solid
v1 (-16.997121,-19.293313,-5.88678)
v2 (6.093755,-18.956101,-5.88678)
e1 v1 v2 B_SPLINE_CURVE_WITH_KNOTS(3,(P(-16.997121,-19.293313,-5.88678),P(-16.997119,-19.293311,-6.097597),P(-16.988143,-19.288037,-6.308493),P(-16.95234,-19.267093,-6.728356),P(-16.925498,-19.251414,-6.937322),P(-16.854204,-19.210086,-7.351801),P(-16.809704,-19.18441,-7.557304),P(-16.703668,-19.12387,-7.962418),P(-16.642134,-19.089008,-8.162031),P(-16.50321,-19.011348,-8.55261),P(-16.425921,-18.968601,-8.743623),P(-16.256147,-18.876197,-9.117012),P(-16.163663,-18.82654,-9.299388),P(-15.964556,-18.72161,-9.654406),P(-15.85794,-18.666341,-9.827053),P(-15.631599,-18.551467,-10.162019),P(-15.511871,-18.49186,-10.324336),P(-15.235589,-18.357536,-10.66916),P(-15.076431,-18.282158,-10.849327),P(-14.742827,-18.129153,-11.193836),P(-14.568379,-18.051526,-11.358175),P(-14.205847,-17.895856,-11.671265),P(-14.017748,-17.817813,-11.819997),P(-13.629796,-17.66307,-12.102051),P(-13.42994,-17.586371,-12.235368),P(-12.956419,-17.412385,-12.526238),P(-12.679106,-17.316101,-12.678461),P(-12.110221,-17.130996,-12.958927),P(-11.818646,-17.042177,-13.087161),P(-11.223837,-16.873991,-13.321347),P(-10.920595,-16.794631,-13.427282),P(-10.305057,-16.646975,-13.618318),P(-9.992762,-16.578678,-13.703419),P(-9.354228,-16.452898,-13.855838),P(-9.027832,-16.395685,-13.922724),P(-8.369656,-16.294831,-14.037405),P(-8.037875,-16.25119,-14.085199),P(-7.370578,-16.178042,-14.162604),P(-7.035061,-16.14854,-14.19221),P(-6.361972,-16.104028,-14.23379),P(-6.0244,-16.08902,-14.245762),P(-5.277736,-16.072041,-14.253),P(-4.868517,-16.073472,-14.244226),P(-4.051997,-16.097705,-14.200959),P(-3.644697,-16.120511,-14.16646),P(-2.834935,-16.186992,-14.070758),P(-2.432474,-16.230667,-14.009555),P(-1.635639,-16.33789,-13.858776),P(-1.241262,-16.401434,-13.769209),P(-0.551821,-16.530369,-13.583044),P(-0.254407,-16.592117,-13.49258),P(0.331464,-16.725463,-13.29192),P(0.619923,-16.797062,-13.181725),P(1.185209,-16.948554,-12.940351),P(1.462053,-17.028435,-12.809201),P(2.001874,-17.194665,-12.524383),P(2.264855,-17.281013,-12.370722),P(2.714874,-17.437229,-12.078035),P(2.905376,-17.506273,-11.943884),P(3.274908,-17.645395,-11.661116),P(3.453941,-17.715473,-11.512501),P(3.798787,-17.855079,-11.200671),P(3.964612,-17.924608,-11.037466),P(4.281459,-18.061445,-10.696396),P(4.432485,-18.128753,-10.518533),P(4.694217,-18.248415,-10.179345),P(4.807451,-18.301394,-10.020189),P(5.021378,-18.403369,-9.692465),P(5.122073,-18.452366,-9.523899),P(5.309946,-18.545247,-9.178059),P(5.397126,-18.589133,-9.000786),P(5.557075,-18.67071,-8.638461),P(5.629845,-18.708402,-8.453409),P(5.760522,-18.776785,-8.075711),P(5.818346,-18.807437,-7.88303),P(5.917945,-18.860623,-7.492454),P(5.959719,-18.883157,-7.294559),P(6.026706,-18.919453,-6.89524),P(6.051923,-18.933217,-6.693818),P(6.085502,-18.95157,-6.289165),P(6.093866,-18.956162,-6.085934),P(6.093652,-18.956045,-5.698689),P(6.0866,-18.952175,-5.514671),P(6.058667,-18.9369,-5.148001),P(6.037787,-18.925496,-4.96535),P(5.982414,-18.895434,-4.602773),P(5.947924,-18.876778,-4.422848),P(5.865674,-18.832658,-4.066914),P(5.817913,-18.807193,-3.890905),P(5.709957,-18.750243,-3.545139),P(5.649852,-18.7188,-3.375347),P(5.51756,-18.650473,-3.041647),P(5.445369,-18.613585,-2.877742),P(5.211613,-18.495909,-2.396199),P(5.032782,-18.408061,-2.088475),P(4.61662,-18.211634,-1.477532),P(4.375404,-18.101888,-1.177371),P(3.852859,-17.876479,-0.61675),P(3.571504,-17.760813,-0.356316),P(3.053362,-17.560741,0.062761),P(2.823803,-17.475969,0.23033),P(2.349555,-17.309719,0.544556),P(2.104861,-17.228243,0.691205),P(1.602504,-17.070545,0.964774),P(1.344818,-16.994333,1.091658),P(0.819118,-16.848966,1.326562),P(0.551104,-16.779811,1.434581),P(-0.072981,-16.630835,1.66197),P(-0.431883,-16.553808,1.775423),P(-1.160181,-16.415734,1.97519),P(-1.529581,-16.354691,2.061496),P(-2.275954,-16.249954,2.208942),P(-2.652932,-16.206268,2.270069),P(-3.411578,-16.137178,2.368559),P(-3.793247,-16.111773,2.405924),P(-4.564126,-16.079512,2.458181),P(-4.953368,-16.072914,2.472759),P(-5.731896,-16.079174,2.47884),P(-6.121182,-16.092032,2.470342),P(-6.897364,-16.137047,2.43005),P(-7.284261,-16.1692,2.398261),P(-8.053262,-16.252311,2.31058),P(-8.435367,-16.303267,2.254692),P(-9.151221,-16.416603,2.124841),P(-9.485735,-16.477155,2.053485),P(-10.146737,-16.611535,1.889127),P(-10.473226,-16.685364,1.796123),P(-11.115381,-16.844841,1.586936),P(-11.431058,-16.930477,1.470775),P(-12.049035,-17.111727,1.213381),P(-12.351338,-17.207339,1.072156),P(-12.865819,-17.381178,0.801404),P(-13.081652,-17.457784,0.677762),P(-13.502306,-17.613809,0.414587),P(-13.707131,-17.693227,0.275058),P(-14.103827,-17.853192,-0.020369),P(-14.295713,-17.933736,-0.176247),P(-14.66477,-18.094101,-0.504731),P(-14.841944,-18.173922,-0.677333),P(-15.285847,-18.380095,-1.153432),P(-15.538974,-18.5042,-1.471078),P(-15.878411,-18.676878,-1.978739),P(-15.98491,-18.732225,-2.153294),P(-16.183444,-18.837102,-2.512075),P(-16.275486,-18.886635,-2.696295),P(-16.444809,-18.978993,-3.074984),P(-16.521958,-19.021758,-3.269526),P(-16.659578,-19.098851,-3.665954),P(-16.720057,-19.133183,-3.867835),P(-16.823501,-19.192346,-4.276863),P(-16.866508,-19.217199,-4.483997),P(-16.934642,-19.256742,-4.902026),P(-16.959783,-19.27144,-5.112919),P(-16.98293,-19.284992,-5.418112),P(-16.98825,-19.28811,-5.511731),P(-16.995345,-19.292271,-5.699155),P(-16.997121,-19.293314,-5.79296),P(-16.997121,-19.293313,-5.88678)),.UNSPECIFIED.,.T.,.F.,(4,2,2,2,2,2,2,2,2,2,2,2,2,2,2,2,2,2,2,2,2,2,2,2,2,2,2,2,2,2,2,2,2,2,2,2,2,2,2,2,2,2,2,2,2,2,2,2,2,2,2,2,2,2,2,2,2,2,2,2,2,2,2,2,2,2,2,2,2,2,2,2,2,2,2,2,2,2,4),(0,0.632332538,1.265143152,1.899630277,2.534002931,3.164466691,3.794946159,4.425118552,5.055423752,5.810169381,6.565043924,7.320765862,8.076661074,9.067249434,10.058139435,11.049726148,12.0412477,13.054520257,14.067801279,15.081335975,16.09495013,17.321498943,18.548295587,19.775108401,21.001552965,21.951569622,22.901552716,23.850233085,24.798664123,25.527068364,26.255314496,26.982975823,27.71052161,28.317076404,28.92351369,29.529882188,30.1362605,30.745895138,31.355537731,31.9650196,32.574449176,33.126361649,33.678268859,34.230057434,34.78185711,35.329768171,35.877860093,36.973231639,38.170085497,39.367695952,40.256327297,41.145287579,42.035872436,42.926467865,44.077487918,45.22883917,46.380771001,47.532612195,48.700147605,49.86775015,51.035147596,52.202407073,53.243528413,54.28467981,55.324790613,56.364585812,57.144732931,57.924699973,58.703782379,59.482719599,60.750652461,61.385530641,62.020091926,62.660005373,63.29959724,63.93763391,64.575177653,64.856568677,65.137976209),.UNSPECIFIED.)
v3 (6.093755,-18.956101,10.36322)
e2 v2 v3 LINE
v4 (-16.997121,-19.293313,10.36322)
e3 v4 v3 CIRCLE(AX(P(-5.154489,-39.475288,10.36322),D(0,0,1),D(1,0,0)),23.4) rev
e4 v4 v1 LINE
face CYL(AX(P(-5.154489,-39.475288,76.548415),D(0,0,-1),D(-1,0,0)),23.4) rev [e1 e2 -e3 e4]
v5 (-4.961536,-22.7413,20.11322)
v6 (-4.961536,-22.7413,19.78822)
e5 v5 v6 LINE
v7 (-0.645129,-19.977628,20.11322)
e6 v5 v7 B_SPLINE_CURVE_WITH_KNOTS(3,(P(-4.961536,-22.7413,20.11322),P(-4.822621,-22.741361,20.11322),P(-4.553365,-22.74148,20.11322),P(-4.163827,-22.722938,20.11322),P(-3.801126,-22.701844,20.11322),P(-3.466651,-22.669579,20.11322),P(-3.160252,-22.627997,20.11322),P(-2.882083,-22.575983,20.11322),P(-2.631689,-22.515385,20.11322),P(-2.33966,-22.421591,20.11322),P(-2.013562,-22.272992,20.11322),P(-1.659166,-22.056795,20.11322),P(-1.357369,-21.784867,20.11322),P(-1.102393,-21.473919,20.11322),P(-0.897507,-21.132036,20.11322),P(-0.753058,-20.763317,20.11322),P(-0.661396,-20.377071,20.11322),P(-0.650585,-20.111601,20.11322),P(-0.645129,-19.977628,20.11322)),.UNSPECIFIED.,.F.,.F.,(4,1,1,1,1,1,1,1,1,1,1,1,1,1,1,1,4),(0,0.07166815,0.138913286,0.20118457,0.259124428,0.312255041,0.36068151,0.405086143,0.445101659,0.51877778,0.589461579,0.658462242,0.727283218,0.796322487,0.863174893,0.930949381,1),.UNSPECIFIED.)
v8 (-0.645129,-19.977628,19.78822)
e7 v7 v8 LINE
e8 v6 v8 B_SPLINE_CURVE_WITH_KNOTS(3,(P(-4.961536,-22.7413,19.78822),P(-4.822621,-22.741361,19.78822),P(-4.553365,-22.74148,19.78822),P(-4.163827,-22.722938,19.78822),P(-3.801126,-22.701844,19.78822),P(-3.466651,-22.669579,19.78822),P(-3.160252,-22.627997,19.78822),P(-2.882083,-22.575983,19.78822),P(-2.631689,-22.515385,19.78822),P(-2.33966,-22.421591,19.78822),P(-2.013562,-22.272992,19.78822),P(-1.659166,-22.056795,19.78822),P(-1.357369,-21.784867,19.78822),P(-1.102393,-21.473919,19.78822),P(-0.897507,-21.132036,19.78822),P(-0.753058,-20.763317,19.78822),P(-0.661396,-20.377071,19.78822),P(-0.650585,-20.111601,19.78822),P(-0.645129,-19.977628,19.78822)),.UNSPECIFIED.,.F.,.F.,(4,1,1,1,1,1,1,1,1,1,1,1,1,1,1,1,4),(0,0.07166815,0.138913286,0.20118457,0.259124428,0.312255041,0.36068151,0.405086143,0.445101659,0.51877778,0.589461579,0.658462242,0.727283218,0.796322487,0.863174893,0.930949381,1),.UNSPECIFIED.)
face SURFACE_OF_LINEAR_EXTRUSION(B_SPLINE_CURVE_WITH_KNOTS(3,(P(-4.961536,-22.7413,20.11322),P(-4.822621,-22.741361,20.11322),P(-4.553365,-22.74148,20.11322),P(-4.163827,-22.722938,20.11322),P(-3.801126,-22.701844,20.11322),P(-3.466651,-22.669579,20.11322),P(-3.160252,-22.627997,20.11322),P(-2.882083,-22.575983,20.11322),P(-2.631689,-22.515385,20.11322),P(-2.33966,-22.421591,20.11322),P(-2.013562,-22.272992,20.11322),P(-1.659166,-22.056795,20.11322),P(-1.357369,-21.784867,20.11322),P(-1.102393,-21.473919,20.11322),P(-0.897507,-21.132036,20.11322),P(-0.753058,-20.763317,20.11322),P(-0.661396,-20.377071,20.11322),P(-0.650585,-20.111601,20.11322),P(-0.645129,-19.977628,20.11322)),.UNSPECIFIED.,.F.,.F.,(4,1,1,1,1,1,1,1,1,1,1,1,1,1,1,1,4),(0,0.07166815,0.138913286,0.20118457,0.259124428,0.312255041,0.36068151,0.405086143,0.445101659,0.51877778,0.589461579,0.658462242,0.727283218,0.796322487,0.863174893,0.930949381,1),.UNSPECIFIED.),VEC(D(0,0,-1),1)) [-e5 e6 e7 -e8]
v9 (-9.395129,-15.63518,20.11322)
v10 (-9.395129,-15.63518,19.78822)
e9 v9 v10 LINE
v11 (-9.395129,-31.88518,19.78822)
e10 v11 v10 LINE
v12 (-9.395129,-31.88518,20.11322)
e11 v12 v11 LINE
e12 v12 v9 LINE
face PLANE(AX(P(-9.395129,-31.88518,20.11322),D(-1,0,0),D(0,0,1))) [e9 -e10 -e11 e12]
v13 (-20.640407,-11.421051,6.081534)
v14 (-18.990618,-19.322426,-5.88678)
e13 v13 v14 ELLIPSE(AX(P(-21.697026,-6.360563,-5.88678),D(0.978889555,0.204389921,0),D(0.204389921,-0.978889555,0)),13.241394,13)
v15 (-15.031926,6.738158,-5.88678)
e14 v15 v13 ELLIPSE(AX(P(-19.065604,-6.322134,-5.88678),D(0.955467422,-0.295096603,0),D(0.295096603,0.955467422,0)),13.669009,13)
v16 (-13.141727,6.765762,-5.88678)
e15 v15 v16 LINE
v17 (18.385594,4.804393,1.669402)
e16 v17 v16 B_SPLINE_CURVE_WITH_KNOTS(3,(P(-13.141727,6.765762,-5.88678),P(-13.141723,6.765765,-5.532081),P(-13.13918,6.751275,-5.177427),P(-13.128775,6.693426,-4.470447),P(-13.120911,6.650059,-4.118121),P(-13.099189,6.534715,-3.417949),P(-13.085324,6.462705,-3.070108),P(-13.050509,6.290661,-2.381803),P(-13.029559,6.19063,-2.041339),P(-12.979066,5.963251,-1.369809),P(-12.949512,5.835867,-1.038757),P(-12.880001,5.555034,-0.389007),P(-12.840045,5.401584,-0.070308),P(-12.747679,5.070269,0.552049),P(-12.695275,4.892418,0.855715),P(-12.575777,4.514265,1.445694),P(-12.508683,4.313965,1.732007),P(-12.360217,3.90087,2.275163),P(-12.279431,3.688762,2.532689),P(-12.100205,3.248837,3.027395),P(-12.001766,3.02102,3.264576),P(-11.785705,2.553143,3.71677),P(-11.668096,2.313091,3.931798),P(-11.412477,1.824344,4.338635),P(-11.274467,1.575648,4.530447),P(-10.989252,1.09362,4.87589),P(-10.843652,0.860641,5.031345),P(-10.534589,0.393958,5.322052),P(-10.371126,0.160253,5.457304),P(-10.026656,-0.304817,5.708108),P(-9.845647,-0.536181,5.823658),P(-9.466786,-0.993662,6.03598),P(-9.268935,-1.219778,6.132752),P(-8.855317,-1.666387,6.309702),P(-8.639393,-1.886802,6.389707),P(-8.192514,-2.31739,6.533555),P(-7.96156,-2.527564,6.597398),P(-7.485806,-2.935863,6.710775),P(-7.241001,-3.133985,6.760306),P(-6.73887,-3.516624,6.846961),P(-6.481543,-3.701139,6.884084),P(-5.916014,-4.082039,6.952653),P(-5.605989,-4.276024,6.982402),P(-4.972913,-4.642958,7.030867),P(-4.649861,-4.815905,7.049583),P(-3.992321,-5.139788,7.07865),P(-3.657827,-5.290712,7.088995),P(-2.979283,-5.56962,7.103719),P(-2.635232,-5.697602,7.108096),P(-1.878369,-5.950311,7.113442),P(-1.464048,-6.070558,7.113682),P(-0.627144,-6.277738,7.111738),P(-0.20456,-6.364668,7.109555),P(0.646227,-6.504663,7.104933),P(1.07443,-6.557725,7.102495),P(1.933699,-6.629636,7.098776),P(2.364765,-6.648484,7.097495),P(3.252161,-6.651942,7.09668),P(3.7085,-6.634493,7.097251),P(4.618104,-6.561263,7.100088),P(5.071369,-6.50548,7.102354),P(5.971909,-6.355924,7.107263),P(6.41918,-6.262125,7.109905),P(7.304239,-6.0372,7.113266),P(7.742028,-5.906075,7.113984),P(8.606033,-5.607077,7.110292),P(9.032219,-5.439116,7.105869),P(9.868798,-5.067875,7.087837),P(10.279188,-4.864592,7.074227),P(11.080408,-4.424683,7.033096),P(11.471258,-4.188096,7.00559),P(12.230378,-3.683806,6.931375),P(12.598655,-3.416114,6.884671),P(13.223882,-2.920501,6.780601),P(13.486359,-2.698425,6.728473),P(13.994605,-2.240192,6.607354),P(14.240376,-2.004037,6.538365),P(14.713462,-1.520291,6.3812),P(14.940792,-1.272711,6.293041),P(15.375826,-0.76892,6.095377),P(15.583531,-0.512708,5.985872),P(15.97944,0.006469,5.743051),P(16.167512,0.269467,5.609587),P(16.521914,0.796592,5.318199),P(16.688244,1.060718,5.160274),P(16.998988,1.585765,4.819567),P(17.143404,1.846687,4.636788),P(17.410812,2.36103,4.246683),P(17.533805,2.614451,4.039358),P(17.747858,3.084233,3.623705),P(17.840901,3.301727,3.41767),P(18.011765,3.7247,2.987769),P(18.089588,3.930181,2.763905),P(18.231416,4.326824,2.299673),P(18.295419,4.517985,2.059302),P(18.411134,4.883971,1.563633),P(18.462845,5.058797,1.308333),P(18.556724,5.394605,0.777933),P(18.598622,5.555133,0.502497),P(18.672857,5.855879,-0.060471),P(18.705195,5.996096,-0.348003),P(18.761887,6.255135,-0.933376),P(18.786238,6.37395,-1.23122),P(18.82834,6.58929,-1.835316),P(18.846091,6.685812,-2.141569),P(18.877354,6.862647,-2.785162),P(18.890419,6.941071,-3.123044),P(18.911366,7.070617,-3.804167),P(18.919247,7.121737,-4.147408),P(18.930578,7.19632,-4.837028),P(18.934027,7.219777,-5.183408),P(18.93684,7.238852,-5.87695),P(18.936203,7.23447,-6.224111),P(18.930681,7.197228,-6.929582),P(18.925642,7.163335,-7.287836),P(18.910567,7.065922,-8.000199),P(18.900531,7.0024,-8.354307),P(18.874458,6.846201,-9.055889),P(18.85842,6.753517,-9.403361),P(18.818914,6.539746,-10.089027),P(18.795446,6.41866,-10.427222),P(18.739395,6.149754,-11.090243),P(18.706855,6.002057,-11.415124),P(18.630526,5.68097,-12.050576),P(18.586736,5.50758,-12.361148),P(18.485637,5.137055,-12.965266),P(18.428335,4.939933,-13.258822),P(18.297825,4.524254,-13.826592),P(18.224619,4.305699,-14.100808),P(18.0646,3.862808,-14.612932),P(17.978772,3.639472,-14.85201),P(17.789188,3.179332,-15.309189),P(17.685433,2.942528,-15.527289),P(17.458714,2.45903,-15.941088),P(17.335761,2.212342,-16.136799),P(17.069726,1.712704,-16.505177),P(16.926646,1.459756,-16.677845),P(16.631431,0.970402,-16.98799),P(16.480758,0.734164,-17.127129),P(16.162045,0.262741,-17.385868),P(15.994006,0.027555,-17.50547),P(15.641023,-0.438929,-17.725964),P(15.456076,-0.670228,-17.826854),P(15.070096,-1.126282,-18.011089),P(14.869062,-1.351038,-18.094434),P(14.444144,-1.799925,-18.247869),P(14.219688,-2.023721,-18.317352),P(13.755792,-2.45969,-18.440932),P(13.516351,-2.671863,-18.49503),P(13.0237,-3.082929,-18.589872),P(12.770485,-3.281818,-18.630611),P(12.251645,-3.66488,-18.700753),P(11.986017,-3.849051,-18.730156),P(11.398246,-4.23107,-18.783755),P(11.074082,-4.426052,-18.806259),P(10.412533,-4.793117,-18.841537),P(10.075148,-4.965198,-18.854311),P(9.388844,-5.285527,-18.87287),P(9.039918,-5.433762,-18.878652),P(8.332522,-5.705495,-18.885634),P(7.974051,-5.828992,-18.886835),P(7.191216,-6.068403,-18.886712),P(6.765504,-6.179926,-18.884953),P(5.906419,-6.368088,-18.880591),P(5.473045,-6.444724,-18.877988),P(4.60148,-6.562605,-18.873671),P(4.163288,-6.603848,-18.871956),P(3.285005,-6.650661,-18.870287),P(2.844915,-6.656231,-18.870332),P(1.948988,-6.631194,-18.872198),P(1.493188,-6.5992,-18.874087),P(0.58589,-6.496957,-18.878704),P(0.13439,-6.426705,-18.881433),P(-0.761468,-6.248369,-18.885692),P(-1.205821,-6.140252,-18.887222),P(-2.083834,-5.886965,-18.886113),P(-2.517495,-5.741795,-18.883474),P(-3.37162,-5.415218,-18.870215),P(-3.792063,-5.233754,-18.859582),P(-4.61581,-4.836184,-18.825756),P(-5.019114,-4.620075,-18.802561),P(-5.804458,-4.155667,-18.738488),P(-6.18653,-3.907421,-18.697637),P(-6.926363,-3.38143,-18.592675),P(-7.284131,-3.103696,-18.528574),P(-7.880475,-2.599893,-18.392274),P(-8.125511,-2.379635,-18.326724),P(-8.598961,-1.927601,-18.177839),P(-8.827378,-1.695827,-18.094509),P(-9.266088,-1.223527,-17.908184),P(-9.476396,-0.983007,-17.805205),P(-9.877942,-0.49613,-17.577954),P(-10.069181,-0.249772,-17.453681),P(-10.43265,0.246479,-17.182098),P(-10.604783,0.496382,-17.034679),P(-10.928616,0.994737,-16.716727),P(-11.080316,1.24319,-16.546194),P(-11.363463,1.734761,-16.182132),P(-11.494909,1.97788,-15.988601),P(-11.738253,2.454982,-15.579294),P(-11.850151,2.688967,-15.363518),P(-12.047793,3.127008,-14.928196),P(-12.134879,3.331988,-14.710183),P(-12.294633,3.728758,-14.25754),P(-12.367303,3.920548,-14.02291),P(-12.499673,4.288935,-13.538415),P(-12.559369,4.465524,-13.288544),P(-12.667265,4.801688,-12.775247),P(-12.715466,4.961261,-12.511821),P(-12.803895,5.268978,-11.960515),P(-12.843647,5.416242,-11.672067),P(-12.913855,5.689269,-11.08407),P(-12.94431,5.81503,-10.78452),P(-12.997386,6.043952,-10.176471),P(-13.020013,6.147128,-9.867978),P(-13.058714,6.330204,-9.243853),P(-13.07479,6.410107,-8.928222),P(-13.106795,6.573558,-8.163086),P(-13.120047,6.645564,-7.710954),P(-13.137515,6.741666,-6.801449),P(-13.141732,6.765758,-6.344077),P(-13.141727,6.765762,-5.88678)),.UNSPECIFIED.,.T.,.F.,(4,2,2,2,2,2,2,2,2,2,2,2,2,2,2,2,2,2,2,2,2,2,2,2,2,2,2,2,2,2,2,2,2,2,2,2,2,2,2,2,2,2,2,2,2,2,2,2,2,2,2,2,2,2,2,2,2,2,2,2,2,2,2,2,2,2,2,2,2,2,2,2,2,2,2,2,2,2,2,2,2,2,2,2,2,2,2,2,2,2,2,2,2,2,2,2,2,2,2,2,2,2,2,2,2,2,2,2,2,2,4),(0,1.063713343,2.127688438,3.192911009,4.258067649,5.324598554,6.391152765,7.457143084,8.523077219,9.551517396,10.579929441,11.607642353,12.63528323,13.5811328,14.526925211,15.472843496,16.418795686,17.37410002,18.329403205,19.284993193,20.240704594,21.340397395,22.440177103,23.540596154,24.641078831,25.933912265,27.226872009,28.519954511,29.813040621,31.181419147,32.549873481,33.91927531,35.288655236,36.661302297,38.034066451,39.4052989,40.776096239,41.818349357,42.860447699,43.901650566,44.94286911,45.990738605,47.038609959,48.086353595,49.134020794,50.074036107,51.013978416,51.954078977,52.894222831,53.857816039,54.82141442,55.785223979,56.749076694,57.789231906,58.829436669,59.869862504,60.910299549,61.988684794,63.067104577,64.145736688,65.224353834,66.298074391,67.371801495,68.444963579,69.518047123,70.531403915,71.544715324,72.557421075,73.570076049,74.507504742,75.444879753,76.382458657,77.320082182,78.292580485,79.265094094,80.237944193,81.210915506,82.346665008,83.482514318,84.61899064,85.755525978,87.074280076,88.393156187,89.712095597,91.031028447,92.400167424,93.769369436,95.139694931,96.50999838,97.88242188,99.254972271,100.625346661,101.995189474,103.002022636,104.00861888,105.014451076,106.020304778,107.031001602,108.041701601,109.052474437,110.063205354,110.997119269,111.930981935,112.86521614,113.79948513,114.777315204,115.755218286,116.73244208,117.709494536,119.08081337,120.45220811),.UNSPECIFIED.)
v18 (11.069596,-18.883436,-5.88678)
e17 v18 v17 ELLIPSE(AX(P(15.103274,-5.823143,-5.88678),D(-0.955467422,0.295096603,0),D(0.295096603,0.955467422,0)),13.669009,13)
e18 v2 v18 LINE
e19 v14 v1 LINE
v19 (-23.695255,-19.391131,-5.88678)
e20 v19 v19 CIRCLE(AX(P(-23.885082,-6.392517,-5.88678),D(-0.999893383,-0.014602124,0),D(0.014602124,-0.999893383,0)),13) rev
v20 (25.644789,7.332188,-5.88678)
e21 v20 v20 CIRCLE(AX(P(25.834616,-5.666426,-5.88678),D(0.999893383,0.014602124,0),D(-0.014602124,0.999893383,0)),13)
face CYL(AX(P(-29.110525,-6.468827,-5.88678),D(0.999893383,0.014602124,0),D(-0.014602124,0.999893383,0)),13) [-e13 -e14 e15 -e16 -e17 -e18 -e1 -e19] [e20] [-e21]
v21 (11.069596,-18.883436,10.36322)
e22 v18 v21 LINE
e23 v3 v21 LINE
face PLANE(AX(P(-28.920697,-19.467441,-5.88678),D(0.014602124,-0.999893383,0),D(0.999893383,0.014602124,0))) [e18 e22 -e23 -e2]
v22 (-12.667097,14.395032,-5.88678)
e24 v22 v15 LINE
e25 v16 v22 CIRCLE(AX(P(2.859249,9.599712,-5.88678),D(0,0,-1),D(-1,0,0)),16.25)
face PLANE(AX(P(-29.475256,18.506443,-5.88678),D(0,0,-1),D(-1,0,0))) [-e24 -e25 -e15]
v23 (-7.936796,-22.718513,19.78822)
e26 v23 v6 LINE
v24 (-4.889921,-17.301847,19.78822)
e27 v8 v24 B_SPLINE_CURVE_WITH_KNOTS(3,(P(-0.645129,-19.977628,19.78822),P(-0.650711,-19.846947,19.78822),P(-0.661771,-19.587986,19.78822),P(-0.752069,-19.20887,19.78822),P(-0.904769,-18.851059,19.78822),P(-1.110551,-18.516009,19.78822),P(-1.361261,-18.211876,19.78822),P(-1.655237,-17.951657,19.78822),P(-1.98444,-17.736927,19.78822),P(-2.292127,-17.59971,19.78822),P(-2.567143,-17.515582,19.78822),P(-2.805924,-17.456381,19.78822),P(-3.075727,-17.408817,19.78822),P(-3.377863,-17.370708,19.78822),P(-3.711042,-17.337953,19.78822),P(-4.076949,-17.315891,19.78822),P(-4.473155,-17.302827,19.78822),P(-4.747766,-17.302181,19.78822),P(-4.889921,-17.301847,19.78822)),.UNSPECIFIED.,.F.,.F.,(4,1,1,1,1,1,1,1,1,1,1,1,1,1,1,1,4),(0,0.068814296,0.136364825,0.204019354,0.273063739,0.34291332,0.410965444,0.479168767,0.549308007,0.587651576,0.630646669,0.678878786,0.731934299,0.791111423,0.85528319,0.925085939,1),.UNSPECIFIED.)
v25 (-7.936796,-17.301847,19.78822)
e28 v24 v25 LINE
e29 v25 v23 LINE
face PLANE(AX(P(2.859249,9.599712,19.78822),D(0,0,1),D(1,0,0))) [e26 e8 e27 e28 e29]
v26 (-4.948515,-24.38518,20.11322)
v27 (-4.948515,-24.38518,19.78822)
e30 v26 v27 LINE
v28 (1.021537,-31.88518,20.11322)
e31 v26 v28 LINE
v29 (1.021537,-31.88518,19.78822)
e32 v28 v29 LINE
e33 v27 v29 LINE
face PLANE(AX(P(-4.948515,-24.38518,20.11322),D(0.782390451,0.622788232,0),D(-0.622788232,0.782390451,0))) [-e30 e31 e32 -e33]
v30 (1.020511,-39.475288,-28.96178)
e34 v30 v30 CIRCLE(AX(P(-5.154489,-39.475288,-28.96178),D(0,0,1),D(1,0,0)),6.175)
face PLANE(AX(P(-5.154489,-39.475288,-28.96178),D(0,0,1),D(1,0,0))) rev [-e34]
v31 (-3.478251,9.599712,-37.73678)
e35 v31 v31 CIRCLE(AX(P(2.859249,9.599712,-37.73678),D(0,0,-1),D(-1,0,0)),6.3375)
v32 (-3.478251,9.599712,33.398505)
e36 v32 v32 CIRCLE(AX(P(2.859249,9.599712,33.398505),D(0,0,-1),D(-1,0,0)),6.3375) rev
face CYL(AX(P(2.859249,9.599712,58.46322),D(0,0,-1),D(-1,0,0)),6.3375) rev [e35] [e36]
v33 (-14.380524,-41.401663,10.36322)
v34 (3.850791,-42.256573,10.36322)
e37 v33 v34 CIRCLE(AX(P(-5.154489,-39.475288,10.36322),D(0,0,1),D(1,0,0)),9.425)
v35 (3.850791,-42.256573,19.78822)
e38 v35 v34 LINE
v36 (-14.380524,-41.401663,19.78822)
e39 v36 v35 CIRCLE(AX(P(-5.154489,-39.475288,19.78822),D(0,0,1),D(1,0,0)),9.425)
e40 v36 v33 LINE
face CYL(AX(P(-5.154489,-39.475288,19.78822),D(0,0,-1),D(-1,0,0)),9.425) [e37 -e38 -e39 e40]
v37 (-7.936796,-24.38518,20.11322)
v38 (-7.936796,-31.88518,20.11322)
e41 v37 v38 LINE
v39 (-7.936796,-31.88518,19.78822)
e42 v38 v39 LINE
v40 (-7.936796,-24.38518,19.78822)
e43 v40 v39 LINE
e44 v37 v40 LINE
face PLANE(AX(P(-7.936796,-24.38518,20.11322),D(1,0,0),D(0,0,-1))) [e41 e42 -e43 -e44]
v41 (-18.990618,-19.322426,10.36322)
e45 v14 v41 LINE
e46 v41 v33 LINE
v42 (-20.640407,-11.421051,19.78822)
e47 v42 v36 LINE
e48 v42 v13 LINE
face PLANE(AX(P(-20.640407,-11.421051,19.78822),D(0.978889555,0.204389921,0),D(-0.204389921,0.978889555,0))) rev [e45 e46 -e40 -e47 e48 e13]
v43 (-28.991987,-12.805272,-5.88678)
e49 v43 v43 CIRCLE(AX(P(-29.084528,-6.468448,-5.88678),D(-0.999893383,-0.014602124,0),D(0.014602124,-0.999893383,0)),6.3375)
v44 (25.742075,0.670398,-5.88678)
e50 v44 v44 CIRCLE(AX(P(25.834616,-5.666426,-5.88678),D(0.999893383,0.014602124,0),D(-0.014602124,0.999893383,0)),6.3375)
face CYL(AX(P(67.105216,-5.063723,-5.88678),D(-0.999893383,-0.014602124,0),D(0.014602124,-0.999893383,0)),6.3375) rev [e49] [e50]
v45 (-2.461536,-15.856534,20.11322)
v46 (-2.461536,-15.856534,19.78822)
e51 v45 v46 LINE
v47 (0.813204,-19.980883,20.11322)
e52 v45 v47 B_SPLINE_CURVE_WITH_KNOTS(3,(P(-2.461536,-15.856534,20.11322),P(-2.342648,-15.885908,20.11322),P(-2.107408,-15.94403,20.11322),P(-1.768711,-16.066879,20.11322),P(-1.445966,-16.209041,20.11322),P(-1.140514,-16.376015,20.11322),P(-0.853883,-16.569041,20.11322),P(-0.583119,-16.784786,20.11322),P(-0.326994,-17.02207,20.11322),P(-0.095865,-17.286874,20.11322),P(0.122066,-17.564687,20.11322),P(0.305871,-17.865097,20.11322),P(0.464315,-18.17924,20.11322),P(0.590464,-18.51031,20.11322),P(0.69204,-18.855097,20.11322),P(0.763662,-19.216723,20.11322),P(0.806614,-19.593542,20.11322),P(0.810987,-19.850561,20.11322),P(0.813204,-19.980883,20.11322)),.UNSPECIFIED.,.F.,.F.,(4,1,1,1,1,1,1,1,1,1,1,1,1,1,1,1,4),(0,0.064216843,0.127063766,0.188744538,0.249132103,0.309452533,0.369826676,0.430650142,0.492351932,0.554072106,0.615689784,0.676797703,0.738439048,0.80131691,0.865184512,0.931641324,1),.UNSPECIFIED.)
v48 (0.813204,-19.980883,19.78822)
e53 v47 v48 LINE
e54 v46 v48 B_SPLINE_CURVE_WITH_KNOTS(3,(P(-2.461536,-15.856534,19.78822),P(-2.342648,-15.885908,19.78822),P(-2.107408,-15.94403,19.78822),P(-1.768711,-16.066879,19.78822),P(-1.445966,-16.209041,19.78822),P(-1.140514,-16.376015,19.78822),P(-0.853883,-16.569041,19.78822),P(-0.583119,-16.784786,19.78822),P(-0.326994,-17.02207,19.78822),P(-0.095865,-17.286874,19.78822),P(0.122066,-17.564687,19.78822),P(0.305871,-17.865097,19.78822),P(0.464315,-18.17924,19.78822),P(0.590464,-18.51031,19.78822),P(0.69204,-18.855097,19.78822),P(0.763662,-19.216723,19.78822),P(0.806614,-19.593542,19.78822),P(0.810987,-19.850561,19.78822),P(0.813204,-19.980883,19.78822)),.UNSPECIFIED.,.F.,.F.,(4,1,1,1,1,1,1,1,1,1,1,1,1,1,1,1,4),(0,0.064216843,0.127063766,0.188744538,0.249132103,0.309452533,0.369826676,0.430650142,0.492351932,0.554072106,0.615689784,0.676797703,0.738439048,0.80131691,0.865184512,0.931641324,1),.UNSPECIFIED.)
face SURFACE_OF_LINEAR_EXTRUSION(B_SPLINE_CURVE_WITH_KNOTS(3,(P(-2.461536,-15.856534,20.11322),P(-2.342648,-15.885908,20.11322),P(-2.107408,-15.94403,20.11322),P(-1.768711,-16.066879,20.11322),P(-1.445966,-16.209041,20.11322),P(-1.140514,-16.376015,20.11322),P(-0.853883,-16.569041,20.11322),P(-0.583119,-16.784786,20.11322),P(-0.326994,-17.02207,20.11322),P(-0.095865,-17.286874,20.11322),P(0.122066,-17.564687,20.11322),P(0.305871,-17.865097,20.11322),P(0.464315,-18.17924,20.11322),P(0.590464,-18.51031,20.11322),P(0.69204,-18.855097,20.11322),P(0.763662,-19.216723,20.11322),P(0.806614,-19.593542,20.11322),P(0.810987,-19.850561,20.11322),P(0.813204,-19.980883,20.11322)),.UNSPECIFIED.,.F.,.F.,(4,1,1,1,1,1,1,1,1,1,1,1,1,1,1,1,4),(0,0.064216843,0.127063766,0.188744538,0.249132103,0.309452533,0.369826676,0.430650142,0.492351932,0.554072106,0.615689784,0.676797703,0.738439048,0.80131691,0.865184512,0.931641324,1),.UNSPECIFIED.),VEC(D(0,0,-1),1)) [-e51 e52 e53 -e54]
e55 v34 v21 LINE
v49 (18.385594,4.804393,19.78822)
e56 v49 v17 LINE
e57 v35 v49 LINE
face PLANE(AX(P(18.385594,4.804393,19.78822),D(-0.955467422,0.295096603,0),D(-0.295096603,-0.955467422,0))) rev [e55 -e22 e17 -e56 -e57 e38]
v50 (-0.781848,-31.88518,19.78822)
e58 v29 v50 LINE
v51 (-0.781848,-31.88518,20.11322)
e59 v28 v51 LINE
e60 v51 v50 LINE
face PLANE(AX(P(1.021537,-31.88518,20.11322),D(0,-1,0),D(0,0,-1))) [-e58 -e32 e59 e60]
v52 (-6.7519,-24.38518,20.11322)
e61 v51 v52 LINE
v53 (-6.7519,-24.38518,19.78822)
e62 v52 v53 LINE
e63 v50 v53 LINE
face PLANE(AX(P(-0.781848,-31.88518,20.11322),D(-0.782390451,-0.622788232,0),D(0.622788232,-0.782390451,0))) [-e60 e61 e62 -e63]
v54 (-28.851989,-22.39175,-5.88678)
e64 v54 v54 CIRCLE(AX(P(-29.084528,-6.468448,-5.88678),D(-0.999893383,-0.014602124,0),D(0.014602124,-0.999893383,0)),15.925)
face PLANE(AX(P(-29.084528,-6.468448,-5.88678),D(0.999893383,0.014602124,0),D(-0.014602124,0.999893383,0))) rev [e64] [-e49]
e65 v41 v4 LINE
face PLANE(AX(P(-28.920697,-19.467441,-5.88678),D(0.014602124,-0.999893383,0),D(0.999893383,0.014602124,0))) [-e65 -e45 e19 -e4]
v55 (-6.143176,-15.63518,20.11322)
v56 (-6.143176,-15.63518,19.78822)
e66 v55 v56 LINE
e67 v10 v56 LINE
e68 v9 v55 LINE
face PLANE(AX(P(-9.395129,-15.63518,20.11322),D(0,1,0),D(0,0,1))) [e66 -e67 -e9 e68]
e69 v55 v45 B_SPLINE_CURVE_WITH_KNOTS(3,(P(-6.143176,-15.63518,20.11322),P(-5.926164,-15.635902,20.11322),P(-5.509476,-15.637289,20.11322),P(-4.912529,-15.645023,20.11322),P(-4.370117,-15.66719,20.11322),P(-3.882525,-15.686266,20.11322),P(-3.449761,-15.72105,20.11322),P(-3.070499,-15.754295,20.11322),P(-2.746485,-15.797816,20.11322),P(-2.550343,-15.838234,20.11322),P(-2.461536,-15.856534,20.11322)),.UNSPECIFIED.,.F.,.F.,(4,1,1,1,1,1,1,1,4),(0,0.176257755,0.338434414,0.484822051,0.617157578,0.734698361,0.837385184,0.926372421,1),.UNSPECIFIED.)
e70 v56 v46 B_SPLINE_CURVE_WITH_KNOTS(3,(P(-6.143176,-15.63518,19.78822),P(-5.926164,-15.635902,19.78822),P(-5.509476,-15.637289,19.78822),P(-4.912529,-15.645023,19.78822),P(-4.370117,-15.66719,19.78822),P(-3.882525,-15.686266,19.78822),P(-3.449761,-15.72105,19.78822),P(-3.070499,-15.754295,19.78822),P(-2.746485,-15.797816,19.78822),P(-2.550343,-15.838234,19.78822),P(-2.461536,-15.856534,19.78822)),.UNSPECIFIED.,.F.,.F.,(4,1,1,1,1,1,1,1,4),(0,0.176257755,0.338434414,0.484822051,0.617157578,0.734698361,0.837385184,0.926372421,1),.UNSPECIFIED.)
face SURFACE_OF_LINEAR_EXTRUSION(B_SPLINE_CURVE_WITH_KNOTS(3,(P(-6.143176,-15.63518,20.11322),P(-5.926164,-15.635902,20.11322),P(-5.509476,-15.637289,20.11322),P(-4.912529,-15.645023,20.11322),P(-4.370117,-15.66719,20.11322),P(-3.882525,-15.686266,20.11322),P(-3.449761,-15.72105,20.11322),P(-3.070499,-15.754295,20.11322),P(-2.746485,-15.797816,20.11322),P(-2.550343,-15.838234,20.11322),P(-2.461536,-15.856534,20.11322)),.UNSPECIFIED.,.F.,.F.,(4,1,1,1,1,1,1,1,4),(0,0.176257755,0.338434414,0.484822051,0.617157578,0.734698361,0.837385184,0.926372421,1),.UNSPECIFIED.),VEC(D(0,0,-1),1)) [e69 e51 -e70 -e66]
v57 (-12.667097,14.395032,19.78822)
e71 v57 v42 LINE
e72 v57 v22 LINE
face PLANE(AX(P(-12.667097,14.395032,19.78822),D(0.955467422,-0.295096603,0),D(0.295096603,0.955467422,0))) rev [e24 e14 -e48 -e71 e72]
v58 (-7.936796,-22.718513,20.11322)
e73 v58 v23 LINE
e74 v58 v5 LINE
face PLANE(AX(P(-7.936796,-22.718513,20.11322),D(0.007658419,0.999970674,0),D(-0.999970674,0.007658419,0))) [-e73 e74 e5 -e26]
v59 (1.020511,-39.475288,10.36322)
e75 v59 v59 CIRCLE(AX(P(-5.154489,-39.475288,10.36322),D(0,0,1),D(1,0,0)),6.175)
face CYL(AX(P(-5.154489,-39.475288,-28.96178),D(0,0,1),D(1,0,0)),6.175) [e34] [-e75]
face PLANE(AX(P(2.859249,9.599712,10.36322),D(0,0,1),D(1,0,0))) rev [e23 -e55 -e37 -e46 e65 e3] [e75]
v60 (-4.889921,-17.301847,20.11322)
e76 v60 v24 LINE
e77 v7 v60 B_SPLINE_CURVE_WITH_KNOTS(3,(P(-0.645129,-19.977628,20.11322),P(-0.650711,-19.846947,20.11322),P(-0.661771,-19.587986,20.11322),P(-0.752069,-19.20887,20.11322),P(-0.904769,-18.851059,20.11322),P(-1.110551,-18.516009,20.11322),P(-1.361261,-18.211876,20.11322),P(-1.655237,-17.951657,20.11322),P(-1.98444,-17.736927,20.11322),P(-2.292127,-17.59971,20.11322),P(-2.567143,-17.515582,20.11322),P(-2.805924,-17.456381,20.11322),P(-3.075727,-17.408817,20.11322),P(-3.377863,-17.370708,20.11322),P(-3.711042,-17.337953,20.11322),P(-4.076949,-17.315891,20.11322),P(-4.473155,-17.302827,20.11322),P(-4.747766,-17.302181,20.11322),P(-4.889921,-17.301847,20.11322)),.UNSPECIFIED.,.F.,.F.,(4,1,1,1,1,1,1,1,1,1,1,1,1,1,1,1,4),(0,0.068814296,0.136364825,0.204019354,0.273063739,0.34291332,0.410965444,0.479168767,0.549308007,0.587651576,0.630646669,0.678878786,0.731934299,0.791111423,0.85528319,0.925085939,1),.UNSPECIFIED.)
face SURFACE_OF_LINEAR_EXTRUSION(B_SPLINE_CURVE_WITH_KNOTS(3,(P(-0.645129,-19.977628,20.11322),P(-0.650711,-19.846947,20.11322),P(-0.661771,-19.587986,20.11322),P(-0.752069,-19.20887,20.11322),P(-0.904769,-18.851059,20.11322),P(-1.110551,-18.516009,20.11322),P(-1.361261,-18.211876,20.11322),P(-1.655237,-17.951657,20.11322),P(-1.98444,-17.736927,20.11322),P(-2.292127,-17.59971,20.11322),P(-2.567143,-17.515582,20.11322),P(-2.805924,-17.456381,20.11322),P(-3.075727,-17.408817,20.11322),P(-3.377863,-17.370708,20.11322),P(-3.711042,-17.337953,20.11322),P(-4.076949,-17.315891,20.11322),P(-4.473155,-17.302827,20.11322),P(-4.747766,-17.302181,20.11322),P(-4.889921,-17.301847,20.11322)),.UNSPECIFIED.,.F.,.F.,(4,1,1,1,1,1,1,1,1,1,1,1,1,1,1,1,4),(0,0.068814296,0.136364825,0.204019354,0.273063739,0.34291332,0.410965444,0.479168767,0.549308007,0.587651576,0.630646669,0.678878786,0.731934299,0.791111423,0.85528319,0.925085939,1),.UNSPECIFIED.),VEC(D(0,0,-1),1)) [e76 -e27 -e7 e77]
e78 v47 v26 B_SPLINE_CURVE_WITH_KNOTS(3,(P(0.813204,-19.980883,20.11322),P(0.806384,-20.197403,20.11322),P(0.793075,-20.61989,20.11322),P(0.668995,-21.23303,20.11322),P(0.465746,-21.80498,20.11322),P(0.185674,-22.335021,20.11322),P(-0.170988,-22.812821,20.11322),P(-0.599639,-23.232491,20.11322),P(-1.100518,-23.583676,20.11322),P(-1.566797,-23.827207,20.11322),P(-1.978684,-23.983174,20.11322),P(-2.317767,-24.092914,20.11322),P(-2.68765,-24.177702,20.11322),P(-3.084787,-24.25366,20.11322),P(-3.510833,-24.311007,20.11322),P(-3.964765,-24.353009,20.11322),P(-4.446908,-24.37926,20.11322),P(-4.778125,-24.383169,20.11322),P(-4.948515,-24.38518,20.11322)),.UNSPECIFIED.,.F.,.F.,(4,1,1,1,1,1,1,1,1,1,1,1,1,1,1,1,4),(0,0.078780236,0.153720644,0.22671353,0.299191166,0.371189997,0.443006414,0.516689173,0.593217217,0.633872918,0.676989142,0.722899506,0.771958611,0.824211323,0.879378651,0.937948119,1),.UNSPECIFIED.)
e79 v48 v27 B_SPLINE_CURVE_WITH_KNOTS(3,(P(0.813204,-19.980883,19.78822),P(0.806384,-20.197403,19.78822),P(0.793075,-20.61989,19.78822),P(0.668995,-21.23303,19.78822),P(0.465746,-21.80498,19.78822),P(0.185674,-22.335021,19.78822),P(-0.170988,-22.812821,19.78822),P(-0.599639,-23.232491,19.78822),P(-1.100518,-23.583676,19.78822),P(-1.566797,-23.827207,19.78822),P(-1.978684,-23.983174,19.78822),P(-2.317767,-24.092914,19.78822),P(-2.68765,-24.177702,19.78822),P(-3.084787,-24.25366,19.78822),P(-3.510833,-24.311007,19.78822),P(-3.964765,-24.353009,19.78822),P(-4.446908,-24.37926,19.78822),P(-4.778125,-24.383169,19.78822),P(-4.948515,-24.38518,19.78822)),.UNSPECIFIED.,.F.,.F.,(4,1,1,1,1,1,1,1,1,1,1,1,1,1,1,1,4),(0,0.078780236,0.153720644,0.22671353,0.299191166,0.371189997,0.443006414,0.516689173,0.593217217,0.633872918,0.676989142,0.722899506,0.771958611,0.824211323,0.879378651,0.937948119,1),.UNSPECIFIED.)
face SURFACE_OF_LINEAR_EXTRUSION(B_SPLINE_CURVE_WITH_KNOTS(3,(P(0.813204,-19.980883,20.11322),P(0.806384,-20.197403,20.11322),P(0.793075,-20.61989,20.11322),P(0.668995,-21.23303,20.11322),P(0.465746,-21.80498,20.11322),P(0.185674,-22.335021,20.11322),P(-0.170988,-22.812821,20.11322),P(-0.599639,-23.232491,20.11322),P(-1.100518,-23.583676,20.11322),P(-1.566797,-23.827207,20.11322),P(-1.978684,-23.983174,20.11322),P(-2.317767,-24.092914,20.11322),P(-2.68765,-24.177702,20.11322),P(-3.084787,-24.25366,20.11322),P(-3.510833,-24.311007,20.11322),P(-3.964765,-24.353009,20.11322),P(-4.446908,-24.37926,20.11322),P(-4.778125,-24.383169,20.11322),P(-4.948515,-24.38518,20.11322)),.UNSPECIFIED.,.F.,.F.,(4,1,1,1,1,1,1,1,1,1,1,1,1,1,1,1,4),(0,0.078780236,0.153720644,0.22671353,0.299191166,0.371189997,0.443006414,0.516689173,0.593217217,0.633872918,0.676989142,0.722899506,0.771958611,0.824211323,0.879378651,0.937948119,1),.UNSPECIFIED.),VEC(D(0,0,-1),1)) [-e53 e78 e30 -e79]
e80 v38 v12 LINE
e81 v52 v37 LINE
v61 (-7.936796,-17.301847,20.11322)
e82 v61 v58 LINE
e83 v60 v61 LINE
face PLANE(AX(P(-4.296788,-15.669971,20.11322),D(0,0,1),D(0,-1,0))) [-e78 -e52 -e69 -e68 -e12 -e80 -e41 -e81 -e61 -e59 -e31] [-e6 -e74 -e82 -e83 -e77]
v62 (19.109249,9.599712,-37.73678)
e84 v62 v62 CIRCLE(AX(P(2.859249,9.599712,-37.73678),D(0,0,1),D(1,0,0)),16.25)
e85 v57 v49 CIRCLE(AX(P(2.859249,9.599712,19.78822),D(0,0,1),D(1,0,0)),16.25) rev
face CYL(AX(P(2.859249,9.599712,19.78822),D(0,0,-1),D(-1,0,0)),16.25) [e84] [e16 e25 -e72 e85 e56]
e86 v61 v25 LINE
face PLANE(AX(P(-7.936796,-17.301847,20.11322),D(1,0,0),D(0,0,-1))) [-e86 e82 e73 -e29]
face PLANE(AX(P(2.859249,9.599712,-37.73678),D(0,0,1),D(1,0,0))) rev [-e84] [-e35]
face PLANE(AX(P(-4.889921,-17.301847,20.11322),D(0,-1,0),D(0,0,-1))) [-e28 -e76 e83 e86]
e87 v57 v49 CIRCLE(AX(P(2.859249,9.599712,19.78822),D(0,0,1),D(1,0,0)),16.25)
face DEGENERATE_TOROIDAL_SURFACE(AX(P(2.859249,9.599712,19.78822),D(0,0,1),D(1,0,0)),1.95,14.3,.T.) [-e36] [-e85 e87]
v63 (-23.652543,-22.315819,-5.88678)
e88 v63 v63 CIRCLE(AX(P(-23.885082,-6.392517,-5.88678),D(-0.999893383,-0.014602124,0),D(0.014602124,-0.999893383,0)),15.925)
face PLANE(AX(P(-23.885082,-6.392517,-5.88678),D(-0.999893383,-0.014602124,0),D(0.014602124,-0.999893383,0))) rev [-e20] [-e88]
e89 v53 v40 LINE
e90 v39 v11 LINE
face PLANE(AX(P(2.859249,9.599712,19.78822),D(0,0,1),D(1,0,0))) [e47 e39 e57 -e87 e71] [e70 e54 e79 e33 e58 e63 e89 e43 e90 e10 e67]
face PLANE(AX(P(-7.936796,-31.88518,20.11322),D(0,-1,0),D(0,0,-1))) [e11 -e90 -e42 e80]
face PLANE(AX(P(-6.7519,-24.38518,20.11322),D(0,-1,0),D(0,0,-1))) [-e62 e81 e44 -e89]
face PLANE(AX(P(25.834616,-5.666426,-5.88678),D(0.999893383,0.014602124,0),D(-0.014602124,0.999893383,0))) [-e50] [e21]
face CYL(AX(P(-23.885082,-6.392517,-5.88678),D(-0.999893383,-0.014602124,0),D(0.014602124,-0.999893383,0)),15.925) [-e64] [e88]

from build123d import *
from build123d.topology import SkipClean

# Parameters (mm, degrees)
BOSS_EXTRU_1_DEPTH      = 1.45
ESQUISSE2_R             = 2.5
BOSS_EXTRU_2_DEPTH      = 2.2
BOSS_EXTRU_3_START      = -11.05
ESQUISSE3_R             = 2.5
BOSS_EXTRU_3_DEPTH      = 11.05
BOSS_EXTRU_4_START      = -1.45
ESQUISSE4_R             = 0.95
BOSS_EXTRU_4_DEPTH      = 7.5
CONG_1_R                = 2.2
BOSS_EXTRU_5_DEPTH      = 1
BOSS_EXTRU_5_DEPTH_BACK = 7.454
ENL_V_START             = -6
ENL_V_MAT_EXTRU_2_DEPTH = 6
BOSS_EXTRU_6_DEPTH      = 1
BOSS_EXTRU_6_DEPTH_BACK = 7.45
ESQUISSE8_R             = 2
ESQUISSE9_R             = 2.45
BOSS_EXTRU_7_DEPTH      = 0.8
ENL_V_START_2           = -6.05
ESQUISSE10_R            = 3.6
ESQUISSE10_R_2          = 0.95
ENL_V_MAT_EXTRU_3_DEPTH = 6.05
ESQUISSE11_R            = 0.975
ENL_V_MAT_EXTRU_4_DEPTH = 14.8
ESQUISSE12_R            = 0.975
ENL_V_MAT_EXTRU_5_DEPTH = 14.8
BOSS_EXTRU_8_DEPTH      = 0.05
SCALE1_SCALE            = 6.5


with BuildPart() as part:
    # Esquisse1 → Boss.-Extru.1 (new body)
    with BuildSketch(Plane.XY):
        with BuildLine():
            Line((2.388668556, -0.737741507), (0.152544962, -7.977890074))
            ThreePointArc((0.152544962, -7.977890074), (-1.300802178, -8.998408422), (-2.652272655, -7.846365386))
            Line((-2.652272655, -7.846365386), (-3.615331703, -3.23396357))
            Line((-3.615331703, -3.23396357), (-2.388668556, 0.737741507))
            ThreePointArc((-2.388668556, 0.737741507), (0.737741507, 2.388668556), (2.388668556, -0.737741507))
        make_face()
    extrude(amount=BOSS_EXTRU_1_DEPTH)

    # Esquisse2 → Boss.-Extru.2 (add)
    with BuildSketch(Plane.XY.offset(1.45)):
        with Locations(Location((0, 0, 0), (0, 0, 162.836669811))):
            Circle(ESQUISSE2_R)
    extrude(amount=BOSS_EXTRU_2_DEPTH)

    # Esquisse3 → Boss.-Extru.3 (add)
    with BuildSketch(Plane.XY.offset(3.65).offset(BOSS_EXTRU_3_START)):
        Circle(ESQUISSE3_R)
    extrude(amount=BOSS_EXTRU_3_DEPTH)

    # Esquisse4 → Boss.-Extru.4 (add)
    with BuildSketch(Plane(origin=(0, 0, 0), x_dir=(-1, 0, 0), z_dir=(0, 0, -1)).offset(BOSS_EXTRU_4_START)):
        with Locations(Location((1.232882801, -7.55, 0), (0, 0, 180))):
            Circle(ESQUISSE4_R)
    extrude(amount=BOSS_EXTRU_4_DEPTH)

    # Congé1
    cong_1_edges = [part.edges().sort_by_distance(p)[0] for p in [
        (2.388668556, -0.737741507, 3.65),
    ]]
    fillet(cong_1_edges, radius=CONG_1_R - 0.0001)  # a hair under: the kernel refuses the full size

    # Esquisse5 → Boss.-Extru.5 (add, two sides: drawn at the far end of the back side and taken through both)
    with SkipClean():  # the faces are left unmerged after this step: merging them gives an invalid solid
        with BuildSketch(Plane(origin=(2.499733458, 0.03650531, 0), x_dir=(0, 0, -1), z_dir=(0.9998933833040308, 0.014602123983129264, 0)).offset(-BOSS_EXTRU_5_DEPTH_BACK)):
            with BuildLine():
                Line((2.5, -4.4), (0, -4.4))
                Line((0, -4.4), (0, 1.44275903))
                Line((0, 1.44275903), (2.5, 1.44275903))
                Line((2.5, 1.44275903), (2.5, -0.4))
                ThreePointArc((2.5, -0.4), (4.5, -2.4), (2.5, -4.4))
            make_face()
        extrude(amount=BOSS_EXTRU_5_DEPTH + BOSS_EXTRU_5_DEPTH_BACK)
    add(part.part.scale(1), mode=Mode.REPLACE)  # the faces are merged on a copy

    # Esquisse7 → Enlèv. mat.-Extru.2 (cut)
    with SkipClean():  # the faces are left unmerged after this step: merging them gives an invalid solid
        with BuildSketch(Plane.XY.offset(ENL_V_START)):
            with BuildLine():
                Line((-2.062527014, 1.412792382), (-4.974539167, 1.370266286))
                Line((-4.974539167, 1.370266286), (-4.889222475, -4.471869809))
                Line((-4.889222475, -4.471869809), (-3.361517986, -4.4495597))
                Line((-3.361517986, -4.4495597), (-3.615331703, -3.23396357))
                Line((-3.615331703, -3.23396357), (-2.388668556, 0.737741507))
                ThreePointArc((-2.388668556, 0.737741507), (-2.251046184, 1.087561988), (-2.062527014, 1.412792382))
            make_face()
            with BuildLine():
                Line((1.263130408, -4.38202281), (3.563876187, -4.348423453))
                Line((3.563876187, -4.348423453), (3.478559495, 1.493712642))
                Line((3.478559495, 1.493712642), (2.020392322, 1.472418034))
                ThreePointArc((2.020392322, 1.472418034), (2.46599995, 0.410906614), (2.388668556, -0.737741507))
                Line((2.388668556, -0.737741507), (1.263130408, -4.38202281))
            make_face()
        extrude(amount=ENL_V_MAT_EXTRU_2_DEPTH, mode=Mode.SUBTRACT)
    add(part.part.scale(1), mode=Mode.REPLACE)  # the faces are merged on a copy

    # Esquisse8 → Boss.-Extru.6 (add, two sides: drawn at the far end of the back side and taken through both)
    with BuildSketch(Plane(origin=(2.499733458, 0.03650531, 0), x_dir=(0, 0, -1), z_dir=(0.9998933833040308, 0.014602123983129264, 0)).offset(-BOSS_EXTRU_6_DEPTH_BACK)):
        with Locations(Location((2.5, -2.4, 0), (0, 0, 90))):
            Circle(ESQUISSE8_R)
    extrude(amount=BOSS_EXTRU_6_DEPTH + BOSS_EXTRU_6_DEPTH_BACK)

    # Esquisse9 → Boss.-Extru.7 (add)
    with BuildSketch(Plane(origin=(-4.949472247, -0.072280514, 0), x_dir=(0, 0, 1), z_dir=(-0.9998933833040308, -0.014602123983129264, 0))):
        with Locations(Location((-2.5, -2.4, 0), (0, 0, 270))):
            Circle(ESQUISSE9_R)
    extrude(amount=-BOSS_EXTRU_7_DEPTH)

    # Esquisse10 → Enlèv. mat.-Extru.3 (cut)
    with BuildSketch(Plane(origin=(0, 0, -6.05), x_dir=(-1, 0, 0), z_dir=(0, 0, -1)).offset(ENL_V_START_2)):
        with Locations((1.232882801, -7.55)):
            Circle(ESQUISSE10_R)
        with Locations(Location((1.232882801, -7.55, 0), (0, 0, 180))):
            Circle(ESQUISSE10_R_2, mode=Mode.SUBTRACT)
    extrude(amount=ENL_V_MAT_EXTRU_3_DEPTH, mode=Mode.SUBTRACT)

    # Esquisse11 → Enlèv. mat.-Extru.4 (cut)
    with BuildSketch(Plane(origin=(0, 0, -7.4), x_dir=(-1, 0, 0), z_dir=(0, 0, -1))):
        Circle(ESQUISSE11_R)
    extrude(amount=-ENL_V_MAT_EXTRU_4_DEPTH, mode=Mode.SUBTRACT)

    # Esquisse12 → Enlèv. mat.-Extru.5 (cut)
    with BuildSketch(Plane(origin=(-4.949472247, -0.072280514, 0), x_dir=(0, 0, 1), z_dir=(-0.9998933833040308, -0.014602123983129264, 0))):
        with Locations(Location((-2.5, -2.4, 0), (0, 0, 270))):
            Circle(ESQUISSE12_R)
    extrude(amount=-ENL_V_MAT_EXTRU_5_DEPTH, mode=Mode.SUBTRACT)

    # Esquisse13 → Boss.-Extru.8 (add)
    with BuildSketch(Plane.XY.offset(1.45)):
        with BuildLine():
            Line((-1.885288931, -3.882291157), (-1.38498845, -3.882291157))
            add(Edge.make_bspline(
                [(-1.38498845, -3.882291157), (-1.35160193, -3.88240229), (-1.287496112, -3.882615677), (-1.195658062, -3.883805508), (-1.112210136, -3.887215762), (-1.037195965, -3.890150464), (-0.970616925, -3.895501851), (-0.912268861, -3.900616599), (-0.862420505, -3.907312071), (-0.832244897, -3.91353023), (-0.8185822, -3.916345644)],
                knots=[0, 0, 0, 0, 1.410062039, 2.707475311, 3.878576406, 4.937260626, 5.877586885, 6.699081471, 7.410979367, 8, 8, 8, 8], degree=3))
            add(Edge.make_bspline(
                [(-0.8185822, -3.916345644), (-0.800291754, -3.920864762), (-0.764101047, -3.929806594), (-0.711993857, -3.948706308), (-0.662340769, -3.970577469), (-0.615348037, -3.996265841), (-0.571251044, -4.025962112), (-0.529595107, -4.059153628), (-0.490191205, -4.095658775), (-0.454632898, -4.136397947), (-0.421105004, -4.179138311), (-0.392827413, -4.22535528), (-0.368451356, -4.273684943), (-0.349043844, -4.324618813), (-0.33341672, -4.377662936), (-0.322397978, -4.43329779), (-0.315789987, -4.491269915), (-0.315117233, -4.530811279), (-0.31477611, -4.550860869)],
                knots=[0, 0, 0, 0, 1.027469482, 2.033020251, 3.019912614, 3.986113645, 4.951240523, 5.91722682, 6.890402269, 7.87763091, 8.8651537, 9.85103654, 10.82876324, 11.815024772, 12.821070561, 13.842952187, 14.906261191, 16, 16, 16, 16], degree=3))
            add(Edge.make_bspline(
                [(-0.31477611, -4.550860869), (-0.315825395, -4.584171658), (-0.31787282, -4.649169635), (-0.33696218, -4.743498836), (-0.368231123, -4.831491203), (-0.411319186, -4.913035945), (-0.46619024, -4.986543548), (-0.53213652, -5.051108159), (-0.609194814, -5.105136668), (-0.680930039, -5.142602957), (-0.744297325, -5.166597892), (-0.796463977, -5.183481006), (-0.853368961, -5.196525267), (-0.914467057, -5.208211075), (-0.980012525, -5.217033714), (-1.049848267, -5.223495567), (-1.12402409, -5.227534173), (-1.174980568, -5.228135605), (-1.20119438, -5.228445003)],
                knots=[0, 0, 0, 0, 1.260483769, 2.459530307, 3.627416485, 4.787058657, 5.939039949, 7.08810263, 8.267026773, 9.491475466, 10.141966685, 10.831826277, 11.566392101, 12.351337768, 13.187381173, 14.07005841, 15.007169909, 16, 16, 16, 16], degree=3))
            Line((-1.20119438, -5.228445003), (-0.282724828, -6.382291157))
            Line((-0.282724828, -6.382291157), (-0.560168739, -6.382291157))
            Line((-0.560168739, -6.382291157), (-1.47863829, -5.228445003))
            Line((-1.47863829, -5.228445003), (-1.660929956, -5.228445003))
            Line((-1.660929956, -5.228445003), (-1.660929956, -6.382291157))
            Line((-1.660929956, -6.382291157), (-1.885288931, -6.382291157))
            Line((-1.885288931, -6.382291157), (-1.885288931, -3.882291157))
        make_face()
        with BuildLine():
            Line((-1.660929956, -4.138701413), (-1.660929956, -4.972034747))
            Line((-1.660929956, -4.972034747), (-1.203197585, -4.975540356))
            add(Edge.make_bspline(
                [(-1.203197585, -4.975540356), (-1.181826128, -4.975549811), (-1.140402159, -4.975568137), (-1.080473113, -4.972715439), (-1.024673033, -4.969470212), (-0.973215353, -4.964506394), (-0.926077085, -4.9581092), (-0.883281789, -4.950107068), (-0.84475961, -4.940784166), (-0.799832082, -4.926354433), (-0.749663131, -4.903492992), (-0.69514066, -4.870231921), (-0.648710419, -4.828396836), (-0.609483374, -4.780558653), (-0.577962352, -4.727961333), (-0.555739456, -4.671235355), (-0.541637711, -4.611812785), (-0.539974464, -4.570971279), (-0.539135085, -4.550360067)],
                knots=[0, 0, 0, 0, 1.146690395, 2.22261258, 3.21895312, 4.145990853, 4.996080663, 5.770904154, 6.481378293, 7.121626537, 8.300444488, 9.431385265, 10.535395872, 11.636531494, 12.74115979, 13.810798291, 14.895190096, 16, 16, 16, 16], degree=3))
            add(Edge.make_bspline(
                [(-0.539135085, -4.550360067), (-0.539993743, -4.530255372), (-0.541695289, -4.490415201), (-0.555587267, -4.432089551), (-0.579079682, -4.37704173), (-0.610738423, -4.325495669), (-0.649309248, -4.278705858), (-0.694536257, -4.238672177), (-0.745182825, -4.205636845), (-0.792519396, -4.184526573), (-0.834829547, -4.171583821), (-0.871565019, -4.162475847), (-0.913073217, -4.155158369), (-0.959555688, -4.149295468), (-1.010813995, -4.144256222), (-1.067107318, -4.140862095), (-1.128062161, -4.138852192), (-1.170309969, -4.138752843), (-1.192179956, -4.138701413)],
                knots=[0, 0, 0, 0, 1.101028733, 2.181837193, 3.264309656, 4.369019818, 5.486613113, 6.575447106, 7.666700264, 8.788928104, 9.402425223, 10.0903467, 10.862060571, 11.710948788, 12.657782767, 13.684531032, 14.801375019, 16, 16, 16, 16], degree=3))
            Line((-1.192179956, -4.138701413), (-1.660929956, -4.138701413))
        make_face(mode=Mode.SUBTRACT)
    extrude(amount=BOSS_EXTRU_8_DEPTH)


with BuildPart() as part_1:
    # Scale1: scaled about (-0.519885651, -1.745435598, -1.884204612)
    add(part.part.scale(SCALE1_SCALE).moved(Location((2.85937108, 9.599895789, 10.363125366))))


solid = part_1.part
